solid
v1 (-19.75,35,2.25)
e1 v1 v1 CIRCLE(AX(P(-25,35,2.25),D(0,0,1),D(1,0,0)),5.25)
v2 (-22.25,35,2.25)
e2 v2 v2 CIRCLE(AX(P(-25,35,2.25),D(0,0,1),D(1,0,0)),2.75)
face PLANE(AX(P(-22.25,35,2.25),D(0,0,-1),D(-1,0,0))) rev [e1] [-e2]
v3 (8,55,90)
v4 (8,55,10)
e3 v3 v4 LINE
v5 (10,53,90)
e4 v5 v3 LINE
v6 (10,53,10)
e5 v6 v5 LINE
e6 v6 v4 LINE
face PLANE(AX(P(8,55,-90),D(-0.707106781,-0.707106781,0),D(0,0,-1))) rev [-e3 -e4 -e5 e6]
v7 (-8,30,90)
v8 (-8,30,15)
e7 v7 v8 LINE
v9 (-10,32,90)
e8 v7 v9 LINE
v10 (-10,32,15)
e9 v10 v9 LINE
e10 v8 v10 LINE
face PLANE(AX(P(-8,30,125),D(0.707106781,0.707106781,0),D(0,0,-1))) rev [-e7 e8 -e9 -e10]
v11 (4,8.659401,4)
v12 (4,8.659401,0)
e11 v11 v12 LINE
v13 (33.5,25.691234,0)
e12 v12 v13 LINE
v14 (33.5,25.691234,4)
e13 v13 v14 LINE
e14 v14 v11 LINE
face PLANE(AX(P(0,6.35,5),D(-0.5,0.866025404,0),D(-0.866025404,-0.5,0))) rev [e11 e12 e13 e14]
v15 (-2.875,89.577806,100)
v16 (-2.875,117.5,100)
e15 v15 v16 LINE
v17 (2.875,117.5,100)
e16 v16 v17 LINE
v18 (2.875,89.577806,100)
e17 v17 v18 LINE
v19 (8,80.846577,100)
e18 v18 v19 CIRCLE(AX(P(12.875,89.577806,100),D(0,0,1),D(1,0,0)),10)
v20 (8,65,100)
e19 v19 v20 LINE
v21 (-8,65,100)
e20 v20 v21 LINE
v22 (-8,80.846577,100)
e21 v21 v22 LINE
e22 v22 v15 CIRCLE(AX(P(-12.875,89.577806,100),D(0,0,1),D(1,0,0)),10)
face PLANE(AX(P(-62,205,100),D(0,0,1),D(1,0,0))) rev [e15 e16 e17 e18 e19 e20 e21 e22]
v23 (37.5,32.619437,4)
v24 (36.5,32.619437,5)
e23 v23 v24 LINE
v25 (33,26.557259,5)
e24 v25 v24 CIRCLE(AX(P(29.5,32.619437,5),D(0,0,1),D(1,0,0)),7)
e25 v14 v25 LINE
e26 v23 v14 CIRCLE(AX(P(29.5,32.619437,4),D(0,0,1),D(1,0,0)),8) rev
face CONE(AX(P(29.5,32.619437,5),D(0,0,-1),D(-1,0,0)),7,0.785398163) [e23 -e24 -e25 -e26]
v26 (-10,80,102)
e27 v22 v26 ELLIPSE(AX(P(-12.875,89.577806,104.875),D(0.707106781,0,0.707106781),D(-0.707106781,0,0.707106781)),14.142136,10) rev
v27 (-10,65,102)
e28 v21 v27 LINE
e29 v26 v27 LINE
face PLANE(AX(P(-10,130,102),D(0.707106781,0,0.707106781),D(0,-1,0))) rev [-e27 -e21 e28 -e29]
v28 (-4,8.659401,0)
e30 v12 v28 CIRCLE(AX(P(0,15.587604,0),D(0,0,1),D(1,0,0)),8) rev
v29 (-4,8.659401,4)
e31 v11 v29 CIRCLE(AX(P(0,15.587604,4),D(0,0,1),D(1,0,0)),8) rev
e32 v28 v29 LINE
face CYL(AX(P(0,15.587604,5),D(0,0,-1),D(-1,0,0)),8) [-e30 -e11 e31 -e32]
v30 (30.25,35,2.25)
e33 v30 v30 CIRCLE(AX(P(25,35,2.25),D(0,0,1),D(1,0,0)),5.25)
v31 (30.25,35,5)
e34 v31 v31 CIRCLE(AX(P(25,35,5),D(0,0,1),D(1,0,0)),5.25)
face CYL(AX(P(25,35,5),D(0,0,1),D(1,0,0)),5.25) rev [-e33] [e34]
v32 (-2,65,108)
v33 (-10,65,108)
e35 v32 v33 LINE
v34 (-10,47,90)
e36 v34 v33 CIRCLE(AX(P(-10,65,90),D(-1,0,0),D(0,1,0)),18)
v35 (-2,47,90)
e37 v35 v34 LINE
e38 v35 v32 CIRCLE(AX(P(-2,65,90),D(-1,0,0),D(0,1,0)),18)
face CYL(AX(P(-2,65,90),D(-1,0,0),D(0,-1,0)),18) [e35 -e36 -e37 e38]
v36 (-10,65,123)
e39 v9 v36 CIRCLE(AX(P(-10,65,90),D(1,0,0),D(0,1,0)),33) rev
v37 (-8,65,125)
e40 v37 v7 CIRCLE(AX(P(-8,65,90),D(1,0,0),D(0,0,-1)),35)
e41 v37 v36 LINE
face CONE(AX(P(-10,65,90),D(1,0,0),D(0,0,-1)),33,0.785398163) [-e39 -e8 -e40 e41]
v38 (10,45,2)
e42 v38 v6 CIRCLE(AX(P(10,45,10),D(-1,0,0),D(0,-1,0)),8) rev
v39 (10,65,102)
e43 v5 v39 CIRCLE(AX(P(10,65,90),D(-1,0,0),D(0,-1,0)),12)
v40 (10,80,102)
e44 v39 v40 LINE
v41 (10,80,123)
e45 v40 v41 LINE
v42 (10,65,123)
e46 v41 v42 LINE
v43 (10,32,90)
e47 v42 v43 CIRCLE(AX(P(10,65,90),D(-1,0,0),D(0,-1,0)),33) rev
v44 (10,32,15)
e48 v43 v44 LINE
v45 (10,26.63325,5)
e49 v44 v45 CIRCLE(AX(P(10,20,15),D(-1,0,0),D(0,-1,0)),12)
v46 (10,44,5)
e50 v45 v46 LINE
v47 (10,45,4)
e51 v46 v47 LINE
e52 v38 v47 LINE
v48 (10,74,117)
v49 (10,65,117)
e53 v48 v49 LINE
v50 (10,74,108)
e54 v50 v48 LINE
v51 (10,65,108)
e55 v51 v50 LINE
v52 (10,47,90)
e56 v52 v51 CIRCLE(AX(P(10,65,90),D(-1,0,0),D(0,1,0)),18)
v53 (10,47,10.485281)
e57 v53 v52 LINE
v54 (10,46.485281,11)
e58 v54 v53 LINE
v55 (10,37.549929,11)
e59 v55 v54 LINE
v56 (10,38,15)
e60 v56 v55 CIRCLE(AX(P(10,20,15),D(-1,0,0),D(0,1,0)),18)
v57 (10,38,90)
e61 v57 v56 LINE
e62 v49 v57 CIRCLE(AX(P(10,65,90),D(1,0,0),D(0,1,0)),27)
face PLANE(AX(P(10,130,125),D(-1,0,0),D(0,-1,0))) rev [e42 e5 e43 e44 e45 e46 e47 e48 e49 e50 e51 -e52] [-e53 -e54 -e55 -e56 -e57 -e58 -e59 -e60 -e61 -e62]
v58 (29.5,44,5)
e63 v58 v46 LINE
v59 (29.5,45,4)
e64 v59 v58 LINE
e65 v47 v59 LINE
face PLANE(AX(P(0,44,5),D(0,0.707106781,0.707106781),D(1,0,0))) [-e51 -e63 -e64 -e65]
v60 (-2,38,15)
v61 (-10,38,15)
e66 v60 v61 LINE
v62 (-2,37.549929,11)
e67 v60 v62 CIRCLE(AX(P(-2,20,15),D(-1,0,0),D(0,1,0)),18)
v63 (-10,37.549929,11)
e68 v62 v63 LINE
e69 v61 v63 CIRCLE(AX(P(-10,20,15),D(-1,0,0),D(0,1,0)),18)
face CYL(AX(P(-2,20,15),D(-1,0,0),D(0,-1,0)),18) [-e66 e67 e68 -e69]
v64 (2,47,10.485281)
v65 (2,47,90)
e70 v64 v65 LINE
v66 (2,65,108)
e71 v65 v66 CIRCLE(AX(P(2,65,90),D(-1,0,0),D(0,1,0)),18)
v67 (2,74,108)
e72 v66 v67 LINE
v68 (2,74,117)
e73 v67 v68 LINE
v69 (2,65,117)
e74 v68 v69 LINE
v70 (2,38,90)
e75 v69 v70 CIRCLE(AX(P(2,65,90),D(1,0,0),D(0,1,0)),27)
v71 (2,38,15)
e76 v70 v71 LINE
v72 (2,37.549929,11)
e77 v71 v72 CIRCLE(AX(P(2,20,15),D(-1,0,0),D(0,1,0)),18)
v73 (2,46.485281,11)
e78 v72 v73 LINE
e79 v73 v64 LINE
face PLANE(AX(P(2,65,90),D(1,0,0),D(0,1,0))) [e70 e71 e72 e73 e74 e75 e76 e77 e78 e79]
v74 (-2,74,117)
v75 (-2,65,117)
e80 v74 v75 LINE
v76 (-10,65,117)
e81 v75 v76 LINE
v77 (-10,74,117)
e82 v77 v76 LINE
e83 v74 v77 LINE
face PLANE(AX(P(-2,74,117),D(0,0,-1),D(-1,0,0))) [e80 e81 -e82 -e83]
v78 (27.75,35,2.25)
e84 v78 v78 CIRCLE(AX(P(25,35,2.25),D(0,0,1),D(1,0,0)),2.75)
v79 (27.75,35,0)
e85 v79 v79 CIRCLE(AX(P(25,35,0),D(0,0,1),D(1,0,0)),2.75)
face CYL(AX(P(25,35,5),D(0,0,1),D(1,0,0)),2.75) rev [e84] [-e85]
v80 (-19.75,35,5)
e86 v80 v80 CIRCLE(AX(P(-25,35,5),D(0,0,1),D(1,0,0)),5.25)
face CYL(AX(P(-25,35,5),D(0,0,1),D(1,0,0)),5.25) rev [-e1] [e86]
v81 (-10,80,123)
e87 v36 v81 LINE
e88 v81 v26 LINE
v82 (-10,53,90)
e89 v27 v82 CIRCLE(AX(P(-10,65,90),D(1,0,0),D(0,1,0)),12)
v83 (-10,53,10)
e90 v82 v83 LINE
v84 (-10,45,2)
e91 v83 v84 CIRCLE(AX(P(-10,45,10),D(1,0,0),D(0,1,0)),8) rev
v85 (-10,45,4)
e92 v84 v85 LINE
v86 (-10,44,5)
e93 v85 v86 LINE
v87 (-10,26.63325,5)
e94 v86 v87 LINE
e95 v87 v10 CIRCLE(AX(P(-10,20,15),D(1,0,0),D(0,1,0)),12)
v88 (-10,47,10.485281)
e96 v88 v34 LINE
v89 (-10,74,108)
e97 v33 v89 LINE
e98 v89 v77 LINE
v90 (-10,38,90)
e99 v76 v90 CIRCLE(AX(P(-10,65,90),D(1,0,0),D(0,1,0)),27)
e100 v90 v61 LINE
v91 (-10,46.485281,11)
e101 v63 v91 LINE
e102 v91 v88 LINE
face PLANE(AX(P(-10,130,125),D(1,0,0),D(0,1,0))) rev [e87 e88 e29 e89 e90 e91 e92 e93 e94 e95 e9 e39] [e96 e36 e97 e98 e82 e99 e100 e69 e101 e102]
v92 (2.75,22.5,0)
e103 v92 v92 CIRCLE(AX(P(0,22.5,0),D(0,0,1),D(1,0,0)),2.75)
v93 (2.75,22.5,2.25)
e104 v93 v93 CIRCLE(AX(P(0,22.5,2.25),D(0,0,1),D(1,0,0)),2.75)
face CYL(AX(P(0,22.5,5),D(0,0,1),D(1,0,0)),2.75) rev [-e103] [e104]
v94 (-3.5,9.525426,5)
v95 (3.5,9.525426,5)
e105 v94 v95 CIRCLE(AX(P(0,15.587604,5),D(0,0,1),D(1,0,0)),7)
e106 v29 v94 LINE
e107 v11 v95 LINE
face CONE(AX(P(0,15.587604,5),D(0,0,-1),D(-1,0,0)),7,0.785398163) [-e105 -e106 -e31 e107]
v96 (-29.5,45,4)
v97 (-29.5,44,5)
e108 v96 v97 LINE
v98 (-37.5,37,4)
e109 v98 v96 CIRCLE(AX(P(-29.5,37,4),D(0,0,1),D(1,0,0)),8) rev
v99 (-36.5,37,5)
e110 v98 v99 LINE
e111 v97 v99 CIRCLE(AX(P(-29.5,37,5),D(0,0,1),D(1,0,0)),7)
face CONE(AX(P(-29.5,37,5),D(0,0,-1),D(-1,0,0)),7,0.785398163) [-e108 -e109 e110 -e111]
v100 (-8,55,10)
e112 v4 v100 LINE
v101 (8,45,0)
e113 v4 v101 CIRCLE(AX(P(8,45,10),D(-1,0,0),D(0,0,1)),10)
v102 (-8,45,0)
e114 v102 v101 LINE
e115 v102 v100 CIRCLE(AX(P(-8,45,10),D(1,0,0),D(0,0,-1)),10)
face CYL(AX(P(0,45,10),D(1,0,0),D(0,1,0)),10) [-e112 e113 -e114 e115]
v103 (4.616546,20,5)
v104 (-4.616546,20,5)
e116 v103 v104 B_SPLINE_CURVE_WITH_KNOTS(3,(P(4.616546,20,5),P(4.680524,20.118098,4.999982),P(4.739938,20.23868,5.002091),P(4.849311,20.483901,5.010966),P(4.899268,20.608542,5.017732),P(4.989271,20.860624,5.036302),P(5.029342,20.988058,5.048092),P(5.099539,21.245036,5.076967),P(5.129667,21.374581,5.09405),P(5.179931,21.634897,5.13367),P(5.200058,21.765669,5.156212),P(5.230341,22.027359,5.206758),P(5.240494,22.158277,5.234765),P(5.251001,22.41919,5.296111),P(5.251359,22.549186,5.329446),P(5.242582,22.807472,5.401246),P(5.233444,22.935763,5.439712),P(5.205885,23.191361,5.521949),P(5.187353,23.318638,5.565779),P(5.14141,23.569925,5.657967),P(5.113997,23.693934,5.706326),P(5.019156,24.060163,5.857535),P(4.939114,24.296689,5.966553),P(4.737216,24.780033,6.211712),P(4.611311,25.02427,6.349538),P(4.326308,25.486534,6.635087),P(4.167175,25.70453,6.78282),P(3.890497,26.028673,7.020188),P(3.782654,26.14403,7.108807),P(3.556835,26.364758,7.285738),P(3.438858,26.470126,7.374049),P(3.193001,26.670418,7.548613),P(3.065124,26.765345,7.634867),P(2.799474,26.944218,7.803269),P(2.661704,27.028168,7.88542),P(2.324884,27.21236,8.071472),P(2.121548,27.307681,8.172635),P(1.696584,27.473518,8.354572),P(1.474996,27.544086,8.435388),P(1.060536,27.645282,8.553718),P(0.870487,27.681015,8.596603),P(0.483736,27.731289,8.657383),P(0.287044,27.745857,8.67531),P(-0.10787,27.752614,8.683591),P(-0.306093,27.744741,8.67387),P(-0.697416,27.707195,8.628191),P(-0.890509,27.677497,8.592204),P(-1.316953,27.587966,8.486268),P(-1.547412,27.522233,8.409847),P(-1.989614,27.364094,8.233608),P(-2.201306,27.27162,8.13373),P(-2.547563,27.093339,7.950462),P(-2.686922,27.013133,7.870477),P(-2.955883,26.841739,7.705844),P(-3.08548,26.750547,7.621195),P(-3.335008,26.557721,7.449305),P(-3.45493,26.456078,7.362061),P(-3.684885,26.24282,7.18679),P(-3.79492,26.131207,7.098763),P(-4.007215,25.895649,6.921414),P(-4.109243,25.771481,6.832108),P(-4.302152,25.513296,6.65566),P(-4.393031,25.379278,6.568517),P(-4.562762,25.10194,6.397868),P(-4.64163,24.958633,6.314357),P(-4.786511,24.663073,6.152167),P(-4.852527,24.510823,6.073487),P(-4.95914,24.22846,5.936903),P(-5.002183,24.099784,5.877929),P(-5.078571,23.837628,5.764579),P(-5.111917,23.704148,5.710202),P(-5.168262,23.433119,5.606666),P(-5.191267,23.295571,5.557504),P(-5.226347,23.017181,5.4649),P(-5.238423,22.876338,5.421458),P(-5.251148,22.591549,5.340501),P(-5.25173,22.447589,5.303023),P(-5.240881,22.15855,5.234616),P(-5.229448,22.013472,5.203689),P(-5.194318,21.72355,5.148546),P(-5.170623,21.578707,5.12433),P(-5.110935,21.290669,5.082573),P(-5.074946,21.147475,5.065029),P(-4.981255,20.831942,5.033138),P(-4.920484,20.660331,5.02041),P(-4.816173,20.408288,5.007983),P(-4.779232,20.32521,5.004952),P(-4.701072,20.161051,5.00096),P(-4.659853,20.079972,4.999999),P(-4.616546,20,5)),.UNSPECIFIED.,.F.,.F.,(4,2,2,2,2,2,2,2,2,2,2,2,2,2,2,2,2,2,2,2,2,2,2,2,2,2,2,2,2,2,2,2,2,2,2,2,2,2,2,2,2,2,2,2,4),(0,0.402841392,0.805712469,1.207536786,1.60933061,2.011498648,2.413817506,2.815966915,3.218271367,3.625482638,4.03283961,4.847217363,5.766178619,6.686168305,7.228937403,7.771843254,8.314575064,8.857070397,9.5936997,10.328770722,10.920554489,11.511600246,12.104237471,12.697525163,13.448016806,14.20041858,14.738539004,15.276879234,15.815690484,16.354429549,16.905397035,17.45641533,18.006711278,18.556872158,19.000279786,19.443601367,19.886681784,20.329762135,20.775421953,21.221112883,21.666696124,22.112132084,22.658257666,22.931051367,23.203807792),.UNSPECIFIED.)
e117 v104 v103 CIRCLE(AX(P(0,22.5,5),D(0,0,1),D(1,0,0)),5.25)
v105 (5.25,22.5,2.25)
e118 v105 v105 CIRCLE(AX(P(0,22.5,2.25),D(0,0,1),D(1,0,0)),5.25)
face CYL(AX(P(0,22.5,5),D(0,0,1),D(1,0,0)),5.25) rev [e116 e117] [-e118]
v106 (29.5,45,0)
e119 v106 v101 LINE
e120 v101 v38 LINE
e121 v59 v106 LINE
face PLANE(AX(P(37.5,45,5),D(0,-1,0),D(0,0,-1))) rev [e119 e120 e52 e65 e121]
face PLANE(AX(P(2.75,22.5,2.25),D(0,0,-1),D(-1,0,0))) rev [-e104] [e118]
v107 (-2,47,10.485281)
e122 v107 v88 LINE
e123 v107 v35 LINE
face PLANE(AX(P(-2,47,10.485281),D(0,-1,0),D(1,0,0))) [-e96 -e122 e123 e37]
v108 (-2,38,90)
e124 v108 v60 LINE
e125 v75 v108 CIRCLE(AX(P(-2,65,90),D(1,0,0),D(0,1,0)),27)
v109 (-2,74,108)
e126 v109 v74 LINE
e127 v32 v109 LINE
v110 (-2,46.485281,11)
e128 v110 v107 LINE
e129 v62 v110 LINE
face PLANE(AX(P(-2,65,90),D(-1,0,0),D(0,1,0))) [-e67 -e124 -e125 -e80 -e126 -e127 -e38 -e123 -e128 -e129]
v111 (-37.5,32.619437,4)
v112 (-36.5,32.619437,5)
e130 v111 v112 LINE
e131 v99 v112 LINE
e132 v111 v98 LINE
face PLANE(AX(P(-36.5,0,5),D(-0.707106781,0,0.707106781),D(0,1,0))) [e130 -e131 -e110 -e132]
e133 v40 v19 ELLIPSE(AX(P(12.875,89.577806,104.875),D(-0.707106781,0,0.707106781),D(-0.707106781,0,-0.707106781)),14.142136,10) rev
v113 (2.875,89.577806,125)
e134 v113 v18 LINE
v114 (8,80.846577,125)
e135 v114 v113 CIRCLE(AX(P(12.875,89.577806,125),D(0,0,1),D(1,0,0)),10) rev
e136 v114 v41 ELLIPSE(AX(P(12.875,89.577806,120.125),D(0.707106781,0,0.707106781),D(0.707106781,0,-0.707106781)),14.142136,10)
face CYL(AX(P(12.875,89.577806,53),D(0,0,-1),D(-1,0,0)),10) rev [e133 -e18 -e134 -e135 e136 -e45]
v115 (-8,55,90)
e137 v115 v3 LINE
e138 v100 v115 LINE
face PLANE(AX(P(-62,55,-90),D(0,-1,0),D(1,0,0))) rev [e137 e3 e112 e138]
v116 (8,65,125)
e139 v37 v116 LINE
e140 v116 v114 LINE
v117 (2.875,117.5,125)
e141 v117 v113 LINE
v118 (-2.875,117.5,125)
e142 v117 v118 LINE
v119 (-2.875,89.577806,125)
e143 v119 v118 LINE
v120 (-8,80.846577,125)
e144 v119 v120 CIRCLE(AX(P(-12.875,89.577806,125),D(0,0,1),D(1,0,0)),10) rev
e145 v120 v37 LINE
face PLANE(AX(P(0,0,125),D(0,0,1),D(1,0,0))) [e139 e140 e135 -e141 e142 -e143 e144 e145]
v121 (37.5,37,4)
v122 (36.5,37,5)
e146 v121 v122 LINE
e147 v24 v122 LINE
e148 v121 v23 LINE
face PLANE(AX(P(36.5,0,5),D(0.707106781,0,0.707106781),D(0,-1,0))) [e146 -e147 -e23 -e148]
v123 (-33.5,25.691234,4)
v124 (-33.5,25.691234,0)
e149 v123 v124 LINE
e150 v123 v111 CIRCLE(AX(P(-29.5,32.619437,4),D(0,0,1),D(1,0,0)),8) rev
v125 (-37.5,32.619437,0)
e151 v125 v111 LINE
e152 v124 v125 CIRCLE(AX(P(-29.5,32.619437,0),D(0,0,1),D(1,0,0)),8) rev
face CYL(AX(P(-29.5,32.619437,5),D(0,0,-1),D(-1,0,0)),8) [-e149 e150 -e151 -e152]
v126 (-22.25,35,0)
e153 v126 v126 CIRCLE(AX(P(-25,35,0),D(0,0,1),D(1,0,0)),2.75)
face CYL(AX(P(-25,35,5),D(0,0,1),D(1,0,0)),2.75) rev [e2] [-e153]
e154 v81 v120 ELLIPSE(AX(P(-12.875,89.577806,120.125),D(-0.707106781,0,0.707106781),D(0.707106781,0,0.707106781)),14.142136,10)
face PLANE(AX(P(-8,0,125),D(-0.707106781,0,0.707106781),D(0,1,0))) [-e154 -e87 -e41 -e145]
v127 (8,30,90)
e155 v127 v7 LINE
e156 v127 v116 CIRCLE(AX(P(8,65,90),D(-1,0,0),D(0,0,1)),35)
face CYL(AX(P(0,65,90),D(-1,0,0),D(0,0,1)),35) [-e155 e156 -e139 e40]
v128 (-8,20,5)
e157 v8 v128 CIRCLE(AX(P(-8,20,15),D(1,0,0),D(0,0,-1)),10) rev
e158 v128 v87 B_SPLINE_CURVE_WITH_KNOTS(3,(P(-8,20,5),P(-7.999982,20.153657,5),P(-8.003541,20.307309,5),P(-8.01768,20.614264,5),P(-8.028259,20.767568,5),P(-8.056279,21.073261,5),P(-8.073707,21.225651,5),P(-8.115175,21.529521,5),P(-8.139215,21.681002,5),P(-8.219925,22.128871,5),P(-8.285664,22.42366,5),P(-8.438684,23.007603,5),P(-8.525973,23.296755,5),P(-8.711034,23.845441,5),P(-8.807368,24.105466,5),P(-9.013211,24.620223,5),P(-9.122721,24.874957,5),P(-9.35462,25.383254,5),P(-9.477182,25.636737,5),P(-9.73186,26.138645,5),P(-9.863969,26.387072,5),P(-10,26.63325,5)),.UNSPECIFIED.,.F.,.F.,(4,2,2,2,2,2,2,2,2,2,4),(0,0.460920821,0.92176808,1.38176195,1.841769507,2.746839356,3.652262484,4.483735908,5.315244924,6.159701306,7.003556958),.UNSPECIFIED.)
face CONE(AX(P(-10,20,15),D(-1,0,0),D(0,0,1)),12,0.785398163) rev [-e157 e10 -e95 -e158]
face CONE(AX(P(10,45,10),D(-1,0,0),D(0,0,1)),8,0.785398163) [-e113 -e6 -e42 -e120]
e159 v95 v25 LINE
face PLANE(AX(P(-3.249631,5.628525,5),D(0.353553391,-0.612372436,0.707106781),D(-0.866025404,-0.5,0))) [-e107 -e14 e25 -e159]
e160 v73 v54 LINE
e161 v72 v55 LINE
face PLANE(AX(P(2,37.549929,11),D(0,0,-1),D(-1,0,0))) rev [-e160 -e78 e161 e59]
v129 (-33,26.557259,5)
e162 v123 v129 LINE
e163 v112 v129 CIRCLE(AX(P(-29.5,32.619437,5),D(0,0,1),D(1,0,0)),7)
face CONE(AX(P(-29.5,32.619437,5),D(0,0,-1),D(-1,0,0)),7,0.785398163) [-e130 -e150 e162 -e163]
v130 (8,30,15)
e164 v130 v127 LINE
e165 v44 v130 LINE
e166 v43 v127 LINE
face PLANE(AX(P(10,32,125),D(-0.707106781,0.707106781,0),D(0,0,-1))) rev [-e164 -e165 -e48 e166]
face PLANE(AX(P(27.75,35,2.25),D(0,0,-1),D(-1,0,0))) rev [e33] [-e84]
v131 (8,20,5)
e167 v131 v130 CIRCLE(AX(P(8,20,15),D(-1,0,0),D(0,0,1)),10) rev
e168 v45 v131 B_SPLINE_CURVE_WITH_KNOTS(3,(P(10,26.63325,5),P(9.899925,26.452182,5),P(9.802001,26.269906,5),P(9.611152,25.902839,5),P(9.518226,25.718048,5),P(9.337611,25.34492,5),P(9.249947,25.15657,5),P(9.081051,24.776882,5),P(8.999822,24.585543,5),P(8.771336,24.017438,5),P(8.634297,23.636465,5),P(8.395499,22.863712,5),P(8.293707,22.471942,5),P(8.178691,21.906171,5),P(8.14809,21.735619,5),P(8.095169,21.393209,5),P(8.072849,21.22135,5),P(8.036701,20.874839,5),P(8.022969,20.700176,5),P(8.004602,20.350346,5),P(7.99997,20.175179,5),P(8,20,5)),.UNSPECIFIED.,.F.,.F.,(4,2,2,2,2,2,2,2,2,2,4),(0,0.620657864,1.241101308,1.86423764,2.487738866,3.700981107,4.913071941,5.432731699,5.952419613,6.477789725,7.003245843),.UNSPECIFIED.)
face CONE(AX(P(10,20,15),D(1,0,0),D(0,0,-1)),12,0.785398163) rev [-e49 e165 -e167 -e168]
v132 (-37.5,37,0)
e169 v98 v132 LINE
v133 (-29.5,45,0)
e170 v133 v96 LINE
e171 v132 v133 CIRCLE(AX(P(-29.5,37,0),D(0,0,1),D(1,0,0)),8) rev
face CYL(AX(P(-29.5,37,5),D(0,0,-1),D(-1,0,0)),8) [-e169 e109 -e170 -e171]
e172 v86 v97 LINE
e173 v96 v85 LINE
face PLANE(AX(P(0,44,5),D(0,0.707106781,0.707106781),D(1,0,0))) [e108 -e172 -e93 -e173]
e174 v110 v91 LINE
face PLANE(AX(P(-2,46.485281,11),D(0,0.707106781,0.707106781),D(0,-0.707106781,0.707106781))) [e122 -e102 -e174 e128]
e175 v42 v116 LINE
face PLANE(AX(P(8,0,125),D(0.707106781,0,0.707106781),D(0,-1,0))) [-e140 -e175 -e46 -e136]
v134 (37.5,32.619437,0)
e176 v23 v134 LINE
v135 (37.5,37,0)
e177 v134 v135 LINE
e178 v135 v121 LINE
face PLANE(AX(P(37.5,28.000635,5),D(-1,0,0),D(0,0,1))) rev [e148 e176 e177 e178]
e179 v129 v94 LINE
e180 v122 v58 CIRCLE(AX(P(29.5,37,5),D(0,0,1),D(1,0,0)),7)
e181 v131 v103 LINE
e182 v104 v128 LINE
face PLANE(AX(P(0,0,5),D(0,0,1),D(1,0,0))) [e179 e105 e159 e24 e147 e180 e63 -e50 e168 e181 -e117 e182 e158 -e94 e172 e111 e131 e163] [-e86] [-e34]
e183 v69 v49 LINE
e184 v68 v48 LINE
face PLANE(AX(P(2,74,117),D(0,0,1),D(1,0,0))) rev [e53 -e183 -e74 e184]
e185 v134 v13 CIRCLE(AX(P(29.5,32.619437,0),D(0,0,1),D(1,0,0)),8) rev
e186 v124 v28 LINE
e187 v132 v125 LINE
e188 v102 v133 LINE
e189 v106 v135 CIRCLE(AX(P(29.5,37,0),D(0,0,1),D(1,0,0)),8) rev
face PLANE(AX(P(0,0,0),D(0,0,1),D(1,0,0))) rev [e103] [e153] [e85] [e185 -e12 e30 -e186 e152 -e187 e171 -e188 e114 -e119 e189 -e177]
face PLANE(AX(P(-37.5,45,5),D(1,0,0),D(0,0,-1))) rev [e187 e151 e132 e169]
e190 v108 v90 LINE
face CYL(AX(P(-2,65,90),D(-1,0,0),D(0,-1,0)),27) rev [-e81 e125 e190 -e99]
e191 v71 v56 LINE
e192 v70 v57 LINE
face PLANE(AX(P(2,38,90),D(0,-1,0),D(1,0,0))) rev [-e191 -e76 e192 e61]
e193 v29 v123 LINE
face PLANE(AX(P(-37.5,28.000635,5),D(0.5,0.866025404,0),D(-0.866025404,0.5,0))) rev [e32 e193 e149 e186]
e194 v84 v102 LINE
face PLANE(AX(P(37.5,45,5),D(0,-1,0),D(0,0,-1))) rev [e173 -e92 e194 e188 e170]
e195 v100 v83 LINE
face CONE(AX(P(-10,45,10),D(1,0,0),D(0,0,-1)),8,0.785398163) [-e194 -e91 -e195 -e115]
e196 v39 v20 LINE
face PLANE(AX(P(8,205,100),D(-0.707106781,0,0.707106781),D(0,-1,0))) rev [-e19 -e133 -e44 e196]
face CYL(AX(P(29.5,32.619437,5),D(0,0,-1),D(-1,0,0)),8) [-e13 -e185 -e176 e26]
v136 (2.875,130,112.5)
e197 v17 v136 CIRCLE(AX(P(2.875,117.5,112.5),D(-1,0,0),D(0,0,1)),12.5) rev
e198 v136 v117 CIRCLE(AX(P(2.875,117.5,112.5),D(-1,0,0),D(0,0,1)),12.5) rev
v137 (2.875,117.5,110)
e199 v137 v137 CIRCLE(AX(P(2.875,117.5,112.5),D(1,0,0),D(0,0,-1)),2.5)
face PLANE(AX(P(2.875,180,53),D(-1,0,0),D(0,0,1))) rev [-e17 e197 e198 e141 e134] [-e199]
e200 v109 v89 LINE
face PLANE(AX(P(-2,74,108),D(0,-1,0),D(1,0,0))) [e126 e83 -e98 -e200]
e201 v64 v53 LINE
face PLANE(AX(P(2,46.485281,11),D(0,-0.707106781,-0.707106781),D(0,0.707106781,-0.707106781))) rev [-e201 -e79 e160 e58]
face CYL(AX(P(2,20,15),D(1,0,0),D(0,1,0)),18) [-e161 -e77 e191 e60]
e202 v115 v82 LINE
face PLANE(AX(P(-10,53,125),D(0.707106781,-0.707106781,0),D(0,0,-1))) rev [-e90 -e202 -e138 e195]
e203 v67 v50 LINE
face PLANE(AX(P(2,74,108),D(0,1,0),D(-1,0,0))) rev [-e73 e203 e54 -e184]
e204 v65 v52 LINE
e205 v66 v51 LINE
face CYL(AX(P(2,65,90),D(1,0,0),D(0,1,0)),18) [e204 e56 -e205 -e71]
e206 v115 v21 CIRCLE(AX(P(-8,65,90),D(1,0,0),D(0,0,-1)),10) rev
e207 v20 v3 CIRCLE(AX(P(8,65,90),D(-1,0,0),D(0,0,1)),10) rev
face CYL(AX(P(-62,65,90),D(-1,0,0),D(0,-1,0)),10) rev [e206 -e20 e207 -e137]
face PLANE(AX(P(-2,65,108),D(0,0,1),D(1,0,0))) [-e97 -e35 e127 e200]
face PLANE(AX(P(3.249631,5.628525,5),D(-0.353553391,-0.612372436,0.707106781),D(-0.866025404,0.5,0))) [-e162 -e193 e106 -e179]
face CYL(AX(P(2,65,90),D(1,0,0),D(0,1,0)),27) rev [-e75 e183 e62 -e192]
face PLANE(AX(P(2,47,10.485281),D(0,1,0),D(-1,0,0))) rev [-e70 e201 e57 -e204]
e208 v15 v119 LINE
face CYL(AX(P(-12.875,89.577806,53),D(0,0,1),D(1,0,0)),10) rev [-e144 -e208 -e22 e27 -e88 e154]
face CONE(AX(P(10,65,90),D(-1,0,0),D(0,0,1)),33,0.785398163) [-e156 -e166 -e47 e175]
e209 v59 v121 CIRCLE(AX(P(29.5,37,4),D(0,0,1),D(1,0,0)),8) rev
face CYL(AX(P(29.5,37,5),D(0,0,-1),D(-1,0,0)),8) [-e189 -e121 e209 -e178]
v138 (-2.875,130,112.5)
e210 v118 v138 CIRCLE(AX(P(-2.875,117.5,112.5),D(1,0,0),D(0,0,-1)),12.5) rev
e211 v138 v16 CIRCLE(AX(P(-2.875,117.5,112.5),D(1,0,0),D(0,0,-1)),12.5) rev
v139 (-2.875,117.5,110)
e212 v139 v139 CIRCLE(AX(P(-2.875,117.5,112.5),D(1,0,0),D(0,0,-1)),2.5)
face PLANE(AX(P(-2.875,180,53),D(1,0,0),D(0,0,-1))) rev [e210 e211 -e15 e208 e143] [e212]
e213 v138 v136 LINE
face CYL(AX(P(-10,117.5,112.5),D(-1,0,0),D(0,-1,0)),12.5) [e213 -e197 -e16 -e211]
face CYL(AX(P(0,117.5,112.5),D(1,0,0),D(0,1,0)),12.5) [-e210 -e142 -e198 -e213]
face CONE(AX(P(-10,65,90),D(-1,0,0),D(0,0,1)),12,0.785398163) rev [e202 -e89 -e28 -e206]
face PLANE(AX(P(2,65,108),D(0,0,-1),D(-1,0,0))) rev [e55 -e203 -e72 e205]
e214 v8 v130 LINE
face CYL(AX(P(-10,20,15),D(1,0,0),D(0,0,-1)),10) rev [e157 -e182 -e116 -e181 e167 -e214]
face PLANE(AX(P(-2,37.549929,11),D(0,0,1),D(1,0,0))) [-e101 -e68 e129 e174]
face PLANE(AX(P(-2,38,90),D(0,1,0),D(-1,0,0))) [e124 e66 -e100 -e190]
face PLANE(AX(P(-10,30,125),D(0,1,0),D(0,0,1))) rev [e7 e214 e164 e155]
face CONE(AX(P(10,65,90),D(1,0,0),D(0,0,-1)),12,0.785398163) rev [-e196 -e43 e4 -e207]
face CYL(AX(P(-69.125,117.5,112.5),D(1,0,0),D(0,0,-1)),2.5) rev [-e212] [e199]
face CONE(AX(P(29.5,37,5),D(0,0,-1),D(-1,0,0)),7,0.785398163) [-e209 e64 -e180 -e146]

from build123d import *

# Parameters (mm, degrees)
BOSS_EXTRUDE1_DEPTH             = 5
FILLET1_R                       = 8
CBORE_FOR_M5_SBHCS1_D           = 5.5
CBORE_FOR_M5_SBHCS1_DEPTH       = 10
CBORE_FOR_M5_SBHCS1_CBORE_D     = 10.5
CBORE_FOR_M5_SBHCS1_CBORE_DEPTH = 2.75
CBORE_FOR_M5_SBHCS1_TIP         = 1.652366702
SKETCH7_W                       = 20
SKETCH7_H                       = 100
BOSS_EXTRUDE2_DEPTH             = 120
SKETCH8_W                       = 190
SKETCH8_H                       = 150
CUT_EXTRUDE1_DEPTH              = 72
FILLET2_R                       = 12.5
SKETCH9_W                       = 14.25
SKETCH9_H                       = 100
CUT_EXTRUDE2_DEPTH              = 72
SKETCH10_R                      = 2.5
CUT_EXTRUDE3_DEPTH              = 72
FILLET3_R                       = 10
FILLET4_R                       = 10
FILLET5_R                       = 35
FILLET6_R                       = 10
SKETCH12_W                      = 20
SKETCH12_H                      = 10
BOSS_EXTRUDE3_DEPTH             = 5
FILLET7_R                       = 10
CHAMFER1_SIZE                   = 2
CHAMFER2_SIZE                   = 1
CUT_EXTRUDE4_DEPTH              = 8


# Some blends are built 0.0001 mm under size
with BuildPart() as part:
    # Sketch2 → Boss-Extrude1 (new body)
    with BuildSketch(Plane.XY):
        Polygon((-37.5, 28.000635095), (0, 6.35), (37.5, 28.000635095), (37.5, 45), (-37.5, 45), align=None)
    extrude(amount=BOSS_EXTRUDE1_DEPTH)

    # Fillet1
    fillet1_edges = [part.edges().sort_by_distance(p)[0] for p in [
        (37.5, 28.000635095, 2.5),
        (0, 6.35, 2.5),
        (-37.5, 28.000635095, 2.5),
        (-37.5, 45, 2.5),
        (37.5, 45, 2.5),
    ]]
    fillet(fillet1_edges, radius=FILLET1_R)

    # CBORE for M5 SBHCS1
    with Locations(Plane.XY.offset(5)):
        with Locations((-25, 35), (0, 22.5), (25, 35)):
            CounterBoreHole(CBORE_FOR_M5_SBHCS1_D / 2, CBORE_FOR_M5_SBHCS1_CBORE_D / 2, CBORE_FOR_M5_SBHCS1_CBORE_DEPTH, depth=CBORE_FOR_M5_SBHCS1_DEPTH)
            with Locations((0, 0, -(CBORE_FOR_M5_SBHCS1_DEPTH + CBORE_FOR_M5_SBHCS1_TIP / 2))):  # 118° drill point
                Cone(0, CBORE_FOR_M5_SBHCS1_D / 2, CBORE_FOR_M5_SBHCS1_TIP, mode=Mode.SUBTRACT)

    # Sketch7 → Boss-Extrude2 (add)
    with BuildSketch(Plane.XY.offset(5)):
        with Locations((0, 80)):
            Rectangle(SKETCH7_W, SKETCH7_H)
    extrude(amount=BOSS_EXTRUDE2_DEPTH)

    # Sketch8 → Cut-Extrude1 (cut)
    with BuildSketch(Plane(origin=(10, 0, 0), x_dir=(0, 0, -1), z_dir=(1, 0, 0))):
        with Locations((-5, 130)):
            Rectangle(SKETCH8_W, SKETCH8_H)
    extrude(amount=-CUT_EXTRUDE1_DEPTH, mode=Mode.SUBTRACT)

    # Fillet2
    fillet2_edges = [part.edges().sort_by_distance(p)[0] for p in [
        (0, 130, 100),
        (0, 130, 125),
    ]]
    fillet(fillet2_edges, radius=FILLET2_R - 0.0001)  # a hair under: the kernel refuses the full size

    # Sketch9 → Cut-Extrude2 (cut)
    with BuildSketch(Plane.XY.offset(125)):
        with Locations((10, 130)):
            Rectangle(SKETCH9_W, SKETCH9_H)
        with Locations((-10, 130)):
            Rectangle(SKETCH9_W, SKETCH9_H)
    extrude(amount=-CUT_EXTRUDE2_DEPTH, mode=Mode.SUBTRACT)

    # Sketch10 → Cut-Extrude3 (cut)
    with BuildSketch(Plane(origin=(2.875, 0, 0), x_dir=(0, 0, -1), z_dir=(1, 0, 0))):
        with Locations((-112.5, 117.5)):
            Circle(SKETCH10_R)
    extrude(amount=-CUT_EXTRUDE3_DEPTH, mode=Mode.SUBTRACT)

    # Fillet3
    # the kernel refuses this fillet: 10 mm, written as the material it adds along each edge
    with BuildSketch(Plane(origin=(-2.875, 80, 125), x_dir=(-1, 0, 0), z_dir=(0, 0, -1))) as fillet3_piece_1:
        with BuildLine():
            CenterArc((10, 9.577806377), FILLET3_R, 180, 73.291656284)
            Line((0, 9.577806377), (-0.2, 9.577806377))
            Line((-0.2, 9.577806377), (-0.2, 0))
            Line((-0.2, 0), (0, -0.2))
            ThreePointArc((0, -0.2), (3.5625, -0.2), (7.0675, -0.191556128))
            Line((7.0675, -0.191556128), (7.125, 0))
        make_face()
    extrude(amount=25)
    with BuildSketch(Plane(origin=(2.875, 80, 125), x_dir=(0, 1, 0), z_dir=(0, 0, -1))) as fillet3_piece_2:
        with BuildLine():
            CenterArc((9.577806377, 10), FILLET3_R, 196.708343716, 73.291656284)
            Line((0, 7.125), (-0.191556128, 7.0675))
            ThreePointArc((-0.191556128, 7.0675), (-0.2, 3.5625), (-0.2, 0))
            Line((-0.2, 0), (0, -0.2))
            Line((0, -0.2), (9.577806377, -0.2))
            Line((9.577806377, -0.2), (9.577806377, 0))
        make_face()
    extrude(amount=25)

    # Fillet4
    fillet4_edges = [part.edges().sort_by_distance(p)[0] for p in [
        (0, 55, 100),
    ]]
    fillet(fillet4_edges, radius=FILLET4_R)

    # Fillet5
    fillet5_edges = [part.edges().sort_by_distance(p)[0] for p in [
        (0, 30, 125),
    ]]
    fillet(fillet5_edges, radius=FILLET5_R)

    # Fillet6
    # the kernel refuses this fillet: 10 mm, written as the material it adds along each edge
    with BuildSketch(Plane(origin=(10, 30, 5), x_dir=(0, 0, 1), z_dir=(-1, 0, 0))) as fillet6_piece_1_section:
        with BuildLine():
            CenterArc((FILLET6_R, -FILLET6_R), FILLET6_R, 90, 90)
            Line((0, -FILLET6_R), (0, 0))
            Line((0, 0), (FILLET6_R, 0))
        make_face()
    fillet6_piece_1 = extrude(amount=20, mode=Mode.PRIVATE)
    fillet6_piece_1 = fillet6_piece_1 - Plane(origin=(0, 22.5, 7.53044348), x_dir=(1, 0, 0), z_dir=(0, 0, 1)) * Cylinder(5.25, 80, mode=Mode.PRIVATE)
    add(fillet6_piece_1)

    # Sketch12 → Boss-Extrude3 (add)
    with BuildSketch(Plane(origin=(0, 0, 5), x_dir=(-1, 0, 0), z_dir=(0, 0, -1))):
        with Locations((0, 50)):
            Rectangle(SKETCH12_W, SKETCH12_H)
    extrude(amount=BOSS_EXTRUDE3_DEPTH)

    # Fillet7
    # the kernel refuses this fillet: 10 mm, written as the material it takes off along each edge
    with BuildSketch(Plane(origin=(-35, 55, 0), x_dir=(0, 0, 1), z_dir=(1, 0, 0))) as fillet7_piece_1:
        with BuildLine():
            CenterArc((FILLET7_R, FILLET7_R), FILLET7_R, 180, 90)
            Line((0, FILLET7_R), (0, 0))
            Line((0, 0), (FILLET7_R, 0))
        make_face()
    extrude(amount=70, mode=Mode.SUBTRACT)

    # Chamfer1
    # the kernel refuses this chamfer: 2 mm, written as the material it takes off along each edge
    with BuildSketch(Plane(origin=(-10, 65, 100), x_dir=(-0.02749587661058987, 0, 0.9996219169112968), z_dir=(0, 1, 0)), Plane(origin=(10, 85.143365976, 100), x_dir=(0.027495876610586414, 0, 0.9996219169112968), z_dir=(0, -1, 0))) as chamfer1_piece_1:
        Polygon((CHAMFER1_SIZE * 0.999621916911, CHAMFER1_SIZE * 0.0274958766106), (-CHAMFER1_SIZE * 0.0274958766106, CHAMFER1_SIZE * 0.999621916911), (0, 0), align=None)
    extrude(amount=20.143365976, mode=Mode.SUBTRACT)
    with BuildSketch(Plane(origin=(-10, 65, 125), x_dir=(-0.02749587661058987, 0, -0.9996219169112968), z_dir=(0, 1, 0)), Plane(origin=(10, 85.143365976, 125), x_dir=(0.027495876610586414, 0, -0.9996219169112968), z_dir=(0, -1, 0))) as chamfer1_piece_2:
        Polygon((CHAMFER1_SIZE * 0.999621916911, -CHAMFER1_SIZE * 0.0274958766106), (-CHAMFER1_SIZE * 0.0274958766106, -CHAMFER1_SIZE * 0.999621916911), (0, 0), align=None)
    extrude(amount=20.143365976, mode=Mode.SUBTRACT)
    with BuildSketch(Plane(origin=(-10, 55, 10), x_dir=(-0.027495876610589956, -0.9996219169112965, 0), z_dir=(0, 0, 1)), Plane(origin=(10, 55, 90), x_dir=(0.0274958766105822, -0.999621916911297, 0), z_dir=(0, 0, -1))) as chamfer1_piece_3:
        Polygon((CHAMFER1_SIZE * 0.999621916911, CHAMFER1_SIZE * 0.0274958766106), (-CHAMFER1_SIZE * 0.0274958766106, CHAMFER1_SIZE * 0.999621916911), (0, 0), align=None)
    extrude(amount=80, mode=Mode.SUBTRACT)
    with BuildSketch(Plane(origin=(10, 65, 90), x_dir=(0, 0, 1), z_dir=(0, 1, 0))) as chamfer1_piece_4:
        Polygon((10 + CHAMFER1_SIZE, 0), (10, -CHAMFER1_SIZE), (10, 0), align=None)
    revolve(axis=Axis((10, 65, 90), (1, 0, 0)), revolution_arc=90, mode=Mode.SUBTRACT)
    with BuildSketch(Plane(origin=(-10, 65, 90), x_dir=(0, 0, 1), z_dir=(0, 1, 0))) as chamfer1_piece_5:
        Polygon((10 + CHAMFER1_SIZE, 0), (10, CHAMFER1_SIZE), (10, 0), align=None)
    revolve(axis=Axis((-10, 65, 90), (1, 0, 0)), revolution_arc=90, mode=Mode.SUBTRACT)
    with BuildSketch(Plane(origin=(10, 30, 15), x_dir=(0.027495876610581334, 0.999621916911297, 0), z_dir=(0, 0, 1)), Plane(origin=(-10, 30, 15), x_dir=(0.9996219169112968, -0.027495876610585623, 0), z_dir=(0, 0, 1))) as chamfer1_piece_6:
        Polygon((CHAMFER1_SIZE * 0.999621916911, CHAMFER1_SIZE * 0.0274958766106), (-CHAMFER1_SIZE * 0.0274958766106, CHAMFER1_SIZE * 0.999621916911), (0, 0), align=None)
    extrude(amount=75, mode=Mode.SUBTRACT)
    with BuildSketch(Plane(origin=(10, 65, 90), x_dir=(0, 0, 1), z_dir=(0, 1, 0))) as chamfer1_piece_7:
        Polygon((35 - CHAMFER1_SIZE, 0), (35, -CHAMFER1_SIZE), (35, 0), align=None)
    revolve(axis=Axis((10, 65, 90), (1, 0, 0)), revolution_arc=90, mode=Mode.SUBTRACT)
    with BuildSketch(Plane(origin=(-10, 65, 90), x_dir=(0, 0, 1), z_dir=(0, 1, 0))) as chamfer1_piece_8:
        Polygon((35 - CHAMFER1_SIZE, 0), (35, CHAMFER1_SIZE), (35, 0), align=None)
    revolve(axis=Axis((-10, 65, 90), (1, 0, 0)), revolution_arc=90, mode=Mode.SUBTRACT)
    with BuildSketch(Plane(origin=(10, 20, 15), x_dir=(0, 1, 0), z_dir=(0, 0, 1))) as chamfer1_piece_9_section:
        Polygon((10, CHAMFER1_SIZE), (10 + CHAMFER1_SIZE, 0), (10, 0), align=None)
    chamfer1_piece_9 = revolve(axis=Axis((10, 20, 15), (-1, 0, 0)), revolution_arc=119.481154356, mode=Mode.PRIVATE)
    chamfer1_piece_9 = split(chamfer1_piece_9, bisect_by=Plane(origin=(9.27752792, 27.153705444, 5), z_dir=(0, 0, 1)), keep=Keep.TOP, mode=Mode.PRIVATE)
    add(chamfer1_piece_9, mode=Mode.SUBTRACT)
    with BuildSketch(Plane(origin=(-10, 20, 15), x_dir=(0, 1, 0), z_dir=(0, 0, 1))) as chamfer1_piece_10_section:
        Polygon((10, -CHAMFER1_SIZE), (10 + CHAMFER1_SIZE, 0), (10, 0), align=None)
    chamfer1_piece_10 = revolve(axis=Axis((-10, 20, 15), (-1, 0, 0)), revolution_arc=119.481154356, mode=Mode.PRIVATE)
    chamfer1_piece_10 = split(chamfer1_piece_10, bisect_by=Plane(origin=(-9.27752792, 27.153705444, 5), z_dir=(0, 0, 1)), keep=Keep.TOP, mode=Mode.PRIVATE)
    add(chamfer1_piece_10, mode=Mode.SUBTRACT)
    with BuildSketch(Plane(origin=(10, 45, 10), x_dir=(0, 1, 0), z_dir=(0, 0, 1))) as chamfer1_piece_11:
        Polygon((10 - CHAMFER1_SIZE, 0), (10, CHAMFER1_SIZE), (10, 0), align=None)
    revolve(axis=Axis((10, 45, 10), (-1, 0, 0)), revolution_arc=90, mode=Mode.SUBTRACT)
    with BuildSketch(Plane(origin=(-10, 45, 10), x_dir=(0, 1, 0), z_dir=(0, 0, 1))) as chamfer1_piece_12:
        Polygon((10 - CHAMFER1_SIZE, 0), (10, -CHAMFER1_SIZE), (10, 0), align=None)
    revolve(axis=Axis((-10, 45, 10), (-1, 0, 0)), revolution_arc=90, mode=Mode.SUBTRACT)

    # Chamfer2
    chamfer2_edges = [part.edges().sort_by_distance(p)[0] for p in [
        (-37.5, 34.809718624, 5),
        (19.75, 45, 5),
        (37.5, 34.809718624, 5),
        (-18.75, 17.175317547, 5),
        (18.75, 17.175317547, 5),
        (35.156854249, 42.656854249, 5),
        (36.42820323, 28.619437248, 5),
        (0, 7.587604307, 5),
        (-36.42820323, 28.619437248, 5),
        (-35.156854249, 42.656854249, 5),
        (-19.75, 45, 5),
    ]]
    chamfer(chamfer2_edges, length=CHAMFER2_SIZE)

    # Sketch13 → Cut-Extrude4 (cut)
    with BuildSketch(Plane(origin=(10, 0, 0), x_dir=(0, 0, -1), z_dir=(1, 0, 0))):
        with BuildLine():
            Line((-11, 37.549928775), (-11, 46.485281374))
            Line((-11, 46.485281374), (-10.485281374, 47))
            Line((-10.485281374, 47), (-90, 47))
            ThreePointArc((-90, 47), (-102.727922061, 52.272077939), (-108, 65))
            Line((-108, 65), (-108, 74))
            Line((-108, 74), (-117, 74))
            Line((-117, 74), (-117, 65))
            ThreePointArc((-117, 65), (-109.091883092, 45.908116908), (-90, 38))
            Line((-90, 38), (-15, 38))
            ThreePointArc((-15, 38), (-12.987379562, 37.887128304), (-11, 37.549928775))
        make_face()
    cut_extrude4 = extrude(amount=-CUT_EXTRUDE4_DEPTH, mode=Mode.SUBTRACT)

    # Mirror1: Cut-Extrude4 across plane
    add(cut_extrude4.mirror(Plane(origin=(0, 0, 0), x_dir=(0, 0, 1), z_dir=(1, 0, 0))), mode=Mode.SUBTRACT)


solid = part.part
